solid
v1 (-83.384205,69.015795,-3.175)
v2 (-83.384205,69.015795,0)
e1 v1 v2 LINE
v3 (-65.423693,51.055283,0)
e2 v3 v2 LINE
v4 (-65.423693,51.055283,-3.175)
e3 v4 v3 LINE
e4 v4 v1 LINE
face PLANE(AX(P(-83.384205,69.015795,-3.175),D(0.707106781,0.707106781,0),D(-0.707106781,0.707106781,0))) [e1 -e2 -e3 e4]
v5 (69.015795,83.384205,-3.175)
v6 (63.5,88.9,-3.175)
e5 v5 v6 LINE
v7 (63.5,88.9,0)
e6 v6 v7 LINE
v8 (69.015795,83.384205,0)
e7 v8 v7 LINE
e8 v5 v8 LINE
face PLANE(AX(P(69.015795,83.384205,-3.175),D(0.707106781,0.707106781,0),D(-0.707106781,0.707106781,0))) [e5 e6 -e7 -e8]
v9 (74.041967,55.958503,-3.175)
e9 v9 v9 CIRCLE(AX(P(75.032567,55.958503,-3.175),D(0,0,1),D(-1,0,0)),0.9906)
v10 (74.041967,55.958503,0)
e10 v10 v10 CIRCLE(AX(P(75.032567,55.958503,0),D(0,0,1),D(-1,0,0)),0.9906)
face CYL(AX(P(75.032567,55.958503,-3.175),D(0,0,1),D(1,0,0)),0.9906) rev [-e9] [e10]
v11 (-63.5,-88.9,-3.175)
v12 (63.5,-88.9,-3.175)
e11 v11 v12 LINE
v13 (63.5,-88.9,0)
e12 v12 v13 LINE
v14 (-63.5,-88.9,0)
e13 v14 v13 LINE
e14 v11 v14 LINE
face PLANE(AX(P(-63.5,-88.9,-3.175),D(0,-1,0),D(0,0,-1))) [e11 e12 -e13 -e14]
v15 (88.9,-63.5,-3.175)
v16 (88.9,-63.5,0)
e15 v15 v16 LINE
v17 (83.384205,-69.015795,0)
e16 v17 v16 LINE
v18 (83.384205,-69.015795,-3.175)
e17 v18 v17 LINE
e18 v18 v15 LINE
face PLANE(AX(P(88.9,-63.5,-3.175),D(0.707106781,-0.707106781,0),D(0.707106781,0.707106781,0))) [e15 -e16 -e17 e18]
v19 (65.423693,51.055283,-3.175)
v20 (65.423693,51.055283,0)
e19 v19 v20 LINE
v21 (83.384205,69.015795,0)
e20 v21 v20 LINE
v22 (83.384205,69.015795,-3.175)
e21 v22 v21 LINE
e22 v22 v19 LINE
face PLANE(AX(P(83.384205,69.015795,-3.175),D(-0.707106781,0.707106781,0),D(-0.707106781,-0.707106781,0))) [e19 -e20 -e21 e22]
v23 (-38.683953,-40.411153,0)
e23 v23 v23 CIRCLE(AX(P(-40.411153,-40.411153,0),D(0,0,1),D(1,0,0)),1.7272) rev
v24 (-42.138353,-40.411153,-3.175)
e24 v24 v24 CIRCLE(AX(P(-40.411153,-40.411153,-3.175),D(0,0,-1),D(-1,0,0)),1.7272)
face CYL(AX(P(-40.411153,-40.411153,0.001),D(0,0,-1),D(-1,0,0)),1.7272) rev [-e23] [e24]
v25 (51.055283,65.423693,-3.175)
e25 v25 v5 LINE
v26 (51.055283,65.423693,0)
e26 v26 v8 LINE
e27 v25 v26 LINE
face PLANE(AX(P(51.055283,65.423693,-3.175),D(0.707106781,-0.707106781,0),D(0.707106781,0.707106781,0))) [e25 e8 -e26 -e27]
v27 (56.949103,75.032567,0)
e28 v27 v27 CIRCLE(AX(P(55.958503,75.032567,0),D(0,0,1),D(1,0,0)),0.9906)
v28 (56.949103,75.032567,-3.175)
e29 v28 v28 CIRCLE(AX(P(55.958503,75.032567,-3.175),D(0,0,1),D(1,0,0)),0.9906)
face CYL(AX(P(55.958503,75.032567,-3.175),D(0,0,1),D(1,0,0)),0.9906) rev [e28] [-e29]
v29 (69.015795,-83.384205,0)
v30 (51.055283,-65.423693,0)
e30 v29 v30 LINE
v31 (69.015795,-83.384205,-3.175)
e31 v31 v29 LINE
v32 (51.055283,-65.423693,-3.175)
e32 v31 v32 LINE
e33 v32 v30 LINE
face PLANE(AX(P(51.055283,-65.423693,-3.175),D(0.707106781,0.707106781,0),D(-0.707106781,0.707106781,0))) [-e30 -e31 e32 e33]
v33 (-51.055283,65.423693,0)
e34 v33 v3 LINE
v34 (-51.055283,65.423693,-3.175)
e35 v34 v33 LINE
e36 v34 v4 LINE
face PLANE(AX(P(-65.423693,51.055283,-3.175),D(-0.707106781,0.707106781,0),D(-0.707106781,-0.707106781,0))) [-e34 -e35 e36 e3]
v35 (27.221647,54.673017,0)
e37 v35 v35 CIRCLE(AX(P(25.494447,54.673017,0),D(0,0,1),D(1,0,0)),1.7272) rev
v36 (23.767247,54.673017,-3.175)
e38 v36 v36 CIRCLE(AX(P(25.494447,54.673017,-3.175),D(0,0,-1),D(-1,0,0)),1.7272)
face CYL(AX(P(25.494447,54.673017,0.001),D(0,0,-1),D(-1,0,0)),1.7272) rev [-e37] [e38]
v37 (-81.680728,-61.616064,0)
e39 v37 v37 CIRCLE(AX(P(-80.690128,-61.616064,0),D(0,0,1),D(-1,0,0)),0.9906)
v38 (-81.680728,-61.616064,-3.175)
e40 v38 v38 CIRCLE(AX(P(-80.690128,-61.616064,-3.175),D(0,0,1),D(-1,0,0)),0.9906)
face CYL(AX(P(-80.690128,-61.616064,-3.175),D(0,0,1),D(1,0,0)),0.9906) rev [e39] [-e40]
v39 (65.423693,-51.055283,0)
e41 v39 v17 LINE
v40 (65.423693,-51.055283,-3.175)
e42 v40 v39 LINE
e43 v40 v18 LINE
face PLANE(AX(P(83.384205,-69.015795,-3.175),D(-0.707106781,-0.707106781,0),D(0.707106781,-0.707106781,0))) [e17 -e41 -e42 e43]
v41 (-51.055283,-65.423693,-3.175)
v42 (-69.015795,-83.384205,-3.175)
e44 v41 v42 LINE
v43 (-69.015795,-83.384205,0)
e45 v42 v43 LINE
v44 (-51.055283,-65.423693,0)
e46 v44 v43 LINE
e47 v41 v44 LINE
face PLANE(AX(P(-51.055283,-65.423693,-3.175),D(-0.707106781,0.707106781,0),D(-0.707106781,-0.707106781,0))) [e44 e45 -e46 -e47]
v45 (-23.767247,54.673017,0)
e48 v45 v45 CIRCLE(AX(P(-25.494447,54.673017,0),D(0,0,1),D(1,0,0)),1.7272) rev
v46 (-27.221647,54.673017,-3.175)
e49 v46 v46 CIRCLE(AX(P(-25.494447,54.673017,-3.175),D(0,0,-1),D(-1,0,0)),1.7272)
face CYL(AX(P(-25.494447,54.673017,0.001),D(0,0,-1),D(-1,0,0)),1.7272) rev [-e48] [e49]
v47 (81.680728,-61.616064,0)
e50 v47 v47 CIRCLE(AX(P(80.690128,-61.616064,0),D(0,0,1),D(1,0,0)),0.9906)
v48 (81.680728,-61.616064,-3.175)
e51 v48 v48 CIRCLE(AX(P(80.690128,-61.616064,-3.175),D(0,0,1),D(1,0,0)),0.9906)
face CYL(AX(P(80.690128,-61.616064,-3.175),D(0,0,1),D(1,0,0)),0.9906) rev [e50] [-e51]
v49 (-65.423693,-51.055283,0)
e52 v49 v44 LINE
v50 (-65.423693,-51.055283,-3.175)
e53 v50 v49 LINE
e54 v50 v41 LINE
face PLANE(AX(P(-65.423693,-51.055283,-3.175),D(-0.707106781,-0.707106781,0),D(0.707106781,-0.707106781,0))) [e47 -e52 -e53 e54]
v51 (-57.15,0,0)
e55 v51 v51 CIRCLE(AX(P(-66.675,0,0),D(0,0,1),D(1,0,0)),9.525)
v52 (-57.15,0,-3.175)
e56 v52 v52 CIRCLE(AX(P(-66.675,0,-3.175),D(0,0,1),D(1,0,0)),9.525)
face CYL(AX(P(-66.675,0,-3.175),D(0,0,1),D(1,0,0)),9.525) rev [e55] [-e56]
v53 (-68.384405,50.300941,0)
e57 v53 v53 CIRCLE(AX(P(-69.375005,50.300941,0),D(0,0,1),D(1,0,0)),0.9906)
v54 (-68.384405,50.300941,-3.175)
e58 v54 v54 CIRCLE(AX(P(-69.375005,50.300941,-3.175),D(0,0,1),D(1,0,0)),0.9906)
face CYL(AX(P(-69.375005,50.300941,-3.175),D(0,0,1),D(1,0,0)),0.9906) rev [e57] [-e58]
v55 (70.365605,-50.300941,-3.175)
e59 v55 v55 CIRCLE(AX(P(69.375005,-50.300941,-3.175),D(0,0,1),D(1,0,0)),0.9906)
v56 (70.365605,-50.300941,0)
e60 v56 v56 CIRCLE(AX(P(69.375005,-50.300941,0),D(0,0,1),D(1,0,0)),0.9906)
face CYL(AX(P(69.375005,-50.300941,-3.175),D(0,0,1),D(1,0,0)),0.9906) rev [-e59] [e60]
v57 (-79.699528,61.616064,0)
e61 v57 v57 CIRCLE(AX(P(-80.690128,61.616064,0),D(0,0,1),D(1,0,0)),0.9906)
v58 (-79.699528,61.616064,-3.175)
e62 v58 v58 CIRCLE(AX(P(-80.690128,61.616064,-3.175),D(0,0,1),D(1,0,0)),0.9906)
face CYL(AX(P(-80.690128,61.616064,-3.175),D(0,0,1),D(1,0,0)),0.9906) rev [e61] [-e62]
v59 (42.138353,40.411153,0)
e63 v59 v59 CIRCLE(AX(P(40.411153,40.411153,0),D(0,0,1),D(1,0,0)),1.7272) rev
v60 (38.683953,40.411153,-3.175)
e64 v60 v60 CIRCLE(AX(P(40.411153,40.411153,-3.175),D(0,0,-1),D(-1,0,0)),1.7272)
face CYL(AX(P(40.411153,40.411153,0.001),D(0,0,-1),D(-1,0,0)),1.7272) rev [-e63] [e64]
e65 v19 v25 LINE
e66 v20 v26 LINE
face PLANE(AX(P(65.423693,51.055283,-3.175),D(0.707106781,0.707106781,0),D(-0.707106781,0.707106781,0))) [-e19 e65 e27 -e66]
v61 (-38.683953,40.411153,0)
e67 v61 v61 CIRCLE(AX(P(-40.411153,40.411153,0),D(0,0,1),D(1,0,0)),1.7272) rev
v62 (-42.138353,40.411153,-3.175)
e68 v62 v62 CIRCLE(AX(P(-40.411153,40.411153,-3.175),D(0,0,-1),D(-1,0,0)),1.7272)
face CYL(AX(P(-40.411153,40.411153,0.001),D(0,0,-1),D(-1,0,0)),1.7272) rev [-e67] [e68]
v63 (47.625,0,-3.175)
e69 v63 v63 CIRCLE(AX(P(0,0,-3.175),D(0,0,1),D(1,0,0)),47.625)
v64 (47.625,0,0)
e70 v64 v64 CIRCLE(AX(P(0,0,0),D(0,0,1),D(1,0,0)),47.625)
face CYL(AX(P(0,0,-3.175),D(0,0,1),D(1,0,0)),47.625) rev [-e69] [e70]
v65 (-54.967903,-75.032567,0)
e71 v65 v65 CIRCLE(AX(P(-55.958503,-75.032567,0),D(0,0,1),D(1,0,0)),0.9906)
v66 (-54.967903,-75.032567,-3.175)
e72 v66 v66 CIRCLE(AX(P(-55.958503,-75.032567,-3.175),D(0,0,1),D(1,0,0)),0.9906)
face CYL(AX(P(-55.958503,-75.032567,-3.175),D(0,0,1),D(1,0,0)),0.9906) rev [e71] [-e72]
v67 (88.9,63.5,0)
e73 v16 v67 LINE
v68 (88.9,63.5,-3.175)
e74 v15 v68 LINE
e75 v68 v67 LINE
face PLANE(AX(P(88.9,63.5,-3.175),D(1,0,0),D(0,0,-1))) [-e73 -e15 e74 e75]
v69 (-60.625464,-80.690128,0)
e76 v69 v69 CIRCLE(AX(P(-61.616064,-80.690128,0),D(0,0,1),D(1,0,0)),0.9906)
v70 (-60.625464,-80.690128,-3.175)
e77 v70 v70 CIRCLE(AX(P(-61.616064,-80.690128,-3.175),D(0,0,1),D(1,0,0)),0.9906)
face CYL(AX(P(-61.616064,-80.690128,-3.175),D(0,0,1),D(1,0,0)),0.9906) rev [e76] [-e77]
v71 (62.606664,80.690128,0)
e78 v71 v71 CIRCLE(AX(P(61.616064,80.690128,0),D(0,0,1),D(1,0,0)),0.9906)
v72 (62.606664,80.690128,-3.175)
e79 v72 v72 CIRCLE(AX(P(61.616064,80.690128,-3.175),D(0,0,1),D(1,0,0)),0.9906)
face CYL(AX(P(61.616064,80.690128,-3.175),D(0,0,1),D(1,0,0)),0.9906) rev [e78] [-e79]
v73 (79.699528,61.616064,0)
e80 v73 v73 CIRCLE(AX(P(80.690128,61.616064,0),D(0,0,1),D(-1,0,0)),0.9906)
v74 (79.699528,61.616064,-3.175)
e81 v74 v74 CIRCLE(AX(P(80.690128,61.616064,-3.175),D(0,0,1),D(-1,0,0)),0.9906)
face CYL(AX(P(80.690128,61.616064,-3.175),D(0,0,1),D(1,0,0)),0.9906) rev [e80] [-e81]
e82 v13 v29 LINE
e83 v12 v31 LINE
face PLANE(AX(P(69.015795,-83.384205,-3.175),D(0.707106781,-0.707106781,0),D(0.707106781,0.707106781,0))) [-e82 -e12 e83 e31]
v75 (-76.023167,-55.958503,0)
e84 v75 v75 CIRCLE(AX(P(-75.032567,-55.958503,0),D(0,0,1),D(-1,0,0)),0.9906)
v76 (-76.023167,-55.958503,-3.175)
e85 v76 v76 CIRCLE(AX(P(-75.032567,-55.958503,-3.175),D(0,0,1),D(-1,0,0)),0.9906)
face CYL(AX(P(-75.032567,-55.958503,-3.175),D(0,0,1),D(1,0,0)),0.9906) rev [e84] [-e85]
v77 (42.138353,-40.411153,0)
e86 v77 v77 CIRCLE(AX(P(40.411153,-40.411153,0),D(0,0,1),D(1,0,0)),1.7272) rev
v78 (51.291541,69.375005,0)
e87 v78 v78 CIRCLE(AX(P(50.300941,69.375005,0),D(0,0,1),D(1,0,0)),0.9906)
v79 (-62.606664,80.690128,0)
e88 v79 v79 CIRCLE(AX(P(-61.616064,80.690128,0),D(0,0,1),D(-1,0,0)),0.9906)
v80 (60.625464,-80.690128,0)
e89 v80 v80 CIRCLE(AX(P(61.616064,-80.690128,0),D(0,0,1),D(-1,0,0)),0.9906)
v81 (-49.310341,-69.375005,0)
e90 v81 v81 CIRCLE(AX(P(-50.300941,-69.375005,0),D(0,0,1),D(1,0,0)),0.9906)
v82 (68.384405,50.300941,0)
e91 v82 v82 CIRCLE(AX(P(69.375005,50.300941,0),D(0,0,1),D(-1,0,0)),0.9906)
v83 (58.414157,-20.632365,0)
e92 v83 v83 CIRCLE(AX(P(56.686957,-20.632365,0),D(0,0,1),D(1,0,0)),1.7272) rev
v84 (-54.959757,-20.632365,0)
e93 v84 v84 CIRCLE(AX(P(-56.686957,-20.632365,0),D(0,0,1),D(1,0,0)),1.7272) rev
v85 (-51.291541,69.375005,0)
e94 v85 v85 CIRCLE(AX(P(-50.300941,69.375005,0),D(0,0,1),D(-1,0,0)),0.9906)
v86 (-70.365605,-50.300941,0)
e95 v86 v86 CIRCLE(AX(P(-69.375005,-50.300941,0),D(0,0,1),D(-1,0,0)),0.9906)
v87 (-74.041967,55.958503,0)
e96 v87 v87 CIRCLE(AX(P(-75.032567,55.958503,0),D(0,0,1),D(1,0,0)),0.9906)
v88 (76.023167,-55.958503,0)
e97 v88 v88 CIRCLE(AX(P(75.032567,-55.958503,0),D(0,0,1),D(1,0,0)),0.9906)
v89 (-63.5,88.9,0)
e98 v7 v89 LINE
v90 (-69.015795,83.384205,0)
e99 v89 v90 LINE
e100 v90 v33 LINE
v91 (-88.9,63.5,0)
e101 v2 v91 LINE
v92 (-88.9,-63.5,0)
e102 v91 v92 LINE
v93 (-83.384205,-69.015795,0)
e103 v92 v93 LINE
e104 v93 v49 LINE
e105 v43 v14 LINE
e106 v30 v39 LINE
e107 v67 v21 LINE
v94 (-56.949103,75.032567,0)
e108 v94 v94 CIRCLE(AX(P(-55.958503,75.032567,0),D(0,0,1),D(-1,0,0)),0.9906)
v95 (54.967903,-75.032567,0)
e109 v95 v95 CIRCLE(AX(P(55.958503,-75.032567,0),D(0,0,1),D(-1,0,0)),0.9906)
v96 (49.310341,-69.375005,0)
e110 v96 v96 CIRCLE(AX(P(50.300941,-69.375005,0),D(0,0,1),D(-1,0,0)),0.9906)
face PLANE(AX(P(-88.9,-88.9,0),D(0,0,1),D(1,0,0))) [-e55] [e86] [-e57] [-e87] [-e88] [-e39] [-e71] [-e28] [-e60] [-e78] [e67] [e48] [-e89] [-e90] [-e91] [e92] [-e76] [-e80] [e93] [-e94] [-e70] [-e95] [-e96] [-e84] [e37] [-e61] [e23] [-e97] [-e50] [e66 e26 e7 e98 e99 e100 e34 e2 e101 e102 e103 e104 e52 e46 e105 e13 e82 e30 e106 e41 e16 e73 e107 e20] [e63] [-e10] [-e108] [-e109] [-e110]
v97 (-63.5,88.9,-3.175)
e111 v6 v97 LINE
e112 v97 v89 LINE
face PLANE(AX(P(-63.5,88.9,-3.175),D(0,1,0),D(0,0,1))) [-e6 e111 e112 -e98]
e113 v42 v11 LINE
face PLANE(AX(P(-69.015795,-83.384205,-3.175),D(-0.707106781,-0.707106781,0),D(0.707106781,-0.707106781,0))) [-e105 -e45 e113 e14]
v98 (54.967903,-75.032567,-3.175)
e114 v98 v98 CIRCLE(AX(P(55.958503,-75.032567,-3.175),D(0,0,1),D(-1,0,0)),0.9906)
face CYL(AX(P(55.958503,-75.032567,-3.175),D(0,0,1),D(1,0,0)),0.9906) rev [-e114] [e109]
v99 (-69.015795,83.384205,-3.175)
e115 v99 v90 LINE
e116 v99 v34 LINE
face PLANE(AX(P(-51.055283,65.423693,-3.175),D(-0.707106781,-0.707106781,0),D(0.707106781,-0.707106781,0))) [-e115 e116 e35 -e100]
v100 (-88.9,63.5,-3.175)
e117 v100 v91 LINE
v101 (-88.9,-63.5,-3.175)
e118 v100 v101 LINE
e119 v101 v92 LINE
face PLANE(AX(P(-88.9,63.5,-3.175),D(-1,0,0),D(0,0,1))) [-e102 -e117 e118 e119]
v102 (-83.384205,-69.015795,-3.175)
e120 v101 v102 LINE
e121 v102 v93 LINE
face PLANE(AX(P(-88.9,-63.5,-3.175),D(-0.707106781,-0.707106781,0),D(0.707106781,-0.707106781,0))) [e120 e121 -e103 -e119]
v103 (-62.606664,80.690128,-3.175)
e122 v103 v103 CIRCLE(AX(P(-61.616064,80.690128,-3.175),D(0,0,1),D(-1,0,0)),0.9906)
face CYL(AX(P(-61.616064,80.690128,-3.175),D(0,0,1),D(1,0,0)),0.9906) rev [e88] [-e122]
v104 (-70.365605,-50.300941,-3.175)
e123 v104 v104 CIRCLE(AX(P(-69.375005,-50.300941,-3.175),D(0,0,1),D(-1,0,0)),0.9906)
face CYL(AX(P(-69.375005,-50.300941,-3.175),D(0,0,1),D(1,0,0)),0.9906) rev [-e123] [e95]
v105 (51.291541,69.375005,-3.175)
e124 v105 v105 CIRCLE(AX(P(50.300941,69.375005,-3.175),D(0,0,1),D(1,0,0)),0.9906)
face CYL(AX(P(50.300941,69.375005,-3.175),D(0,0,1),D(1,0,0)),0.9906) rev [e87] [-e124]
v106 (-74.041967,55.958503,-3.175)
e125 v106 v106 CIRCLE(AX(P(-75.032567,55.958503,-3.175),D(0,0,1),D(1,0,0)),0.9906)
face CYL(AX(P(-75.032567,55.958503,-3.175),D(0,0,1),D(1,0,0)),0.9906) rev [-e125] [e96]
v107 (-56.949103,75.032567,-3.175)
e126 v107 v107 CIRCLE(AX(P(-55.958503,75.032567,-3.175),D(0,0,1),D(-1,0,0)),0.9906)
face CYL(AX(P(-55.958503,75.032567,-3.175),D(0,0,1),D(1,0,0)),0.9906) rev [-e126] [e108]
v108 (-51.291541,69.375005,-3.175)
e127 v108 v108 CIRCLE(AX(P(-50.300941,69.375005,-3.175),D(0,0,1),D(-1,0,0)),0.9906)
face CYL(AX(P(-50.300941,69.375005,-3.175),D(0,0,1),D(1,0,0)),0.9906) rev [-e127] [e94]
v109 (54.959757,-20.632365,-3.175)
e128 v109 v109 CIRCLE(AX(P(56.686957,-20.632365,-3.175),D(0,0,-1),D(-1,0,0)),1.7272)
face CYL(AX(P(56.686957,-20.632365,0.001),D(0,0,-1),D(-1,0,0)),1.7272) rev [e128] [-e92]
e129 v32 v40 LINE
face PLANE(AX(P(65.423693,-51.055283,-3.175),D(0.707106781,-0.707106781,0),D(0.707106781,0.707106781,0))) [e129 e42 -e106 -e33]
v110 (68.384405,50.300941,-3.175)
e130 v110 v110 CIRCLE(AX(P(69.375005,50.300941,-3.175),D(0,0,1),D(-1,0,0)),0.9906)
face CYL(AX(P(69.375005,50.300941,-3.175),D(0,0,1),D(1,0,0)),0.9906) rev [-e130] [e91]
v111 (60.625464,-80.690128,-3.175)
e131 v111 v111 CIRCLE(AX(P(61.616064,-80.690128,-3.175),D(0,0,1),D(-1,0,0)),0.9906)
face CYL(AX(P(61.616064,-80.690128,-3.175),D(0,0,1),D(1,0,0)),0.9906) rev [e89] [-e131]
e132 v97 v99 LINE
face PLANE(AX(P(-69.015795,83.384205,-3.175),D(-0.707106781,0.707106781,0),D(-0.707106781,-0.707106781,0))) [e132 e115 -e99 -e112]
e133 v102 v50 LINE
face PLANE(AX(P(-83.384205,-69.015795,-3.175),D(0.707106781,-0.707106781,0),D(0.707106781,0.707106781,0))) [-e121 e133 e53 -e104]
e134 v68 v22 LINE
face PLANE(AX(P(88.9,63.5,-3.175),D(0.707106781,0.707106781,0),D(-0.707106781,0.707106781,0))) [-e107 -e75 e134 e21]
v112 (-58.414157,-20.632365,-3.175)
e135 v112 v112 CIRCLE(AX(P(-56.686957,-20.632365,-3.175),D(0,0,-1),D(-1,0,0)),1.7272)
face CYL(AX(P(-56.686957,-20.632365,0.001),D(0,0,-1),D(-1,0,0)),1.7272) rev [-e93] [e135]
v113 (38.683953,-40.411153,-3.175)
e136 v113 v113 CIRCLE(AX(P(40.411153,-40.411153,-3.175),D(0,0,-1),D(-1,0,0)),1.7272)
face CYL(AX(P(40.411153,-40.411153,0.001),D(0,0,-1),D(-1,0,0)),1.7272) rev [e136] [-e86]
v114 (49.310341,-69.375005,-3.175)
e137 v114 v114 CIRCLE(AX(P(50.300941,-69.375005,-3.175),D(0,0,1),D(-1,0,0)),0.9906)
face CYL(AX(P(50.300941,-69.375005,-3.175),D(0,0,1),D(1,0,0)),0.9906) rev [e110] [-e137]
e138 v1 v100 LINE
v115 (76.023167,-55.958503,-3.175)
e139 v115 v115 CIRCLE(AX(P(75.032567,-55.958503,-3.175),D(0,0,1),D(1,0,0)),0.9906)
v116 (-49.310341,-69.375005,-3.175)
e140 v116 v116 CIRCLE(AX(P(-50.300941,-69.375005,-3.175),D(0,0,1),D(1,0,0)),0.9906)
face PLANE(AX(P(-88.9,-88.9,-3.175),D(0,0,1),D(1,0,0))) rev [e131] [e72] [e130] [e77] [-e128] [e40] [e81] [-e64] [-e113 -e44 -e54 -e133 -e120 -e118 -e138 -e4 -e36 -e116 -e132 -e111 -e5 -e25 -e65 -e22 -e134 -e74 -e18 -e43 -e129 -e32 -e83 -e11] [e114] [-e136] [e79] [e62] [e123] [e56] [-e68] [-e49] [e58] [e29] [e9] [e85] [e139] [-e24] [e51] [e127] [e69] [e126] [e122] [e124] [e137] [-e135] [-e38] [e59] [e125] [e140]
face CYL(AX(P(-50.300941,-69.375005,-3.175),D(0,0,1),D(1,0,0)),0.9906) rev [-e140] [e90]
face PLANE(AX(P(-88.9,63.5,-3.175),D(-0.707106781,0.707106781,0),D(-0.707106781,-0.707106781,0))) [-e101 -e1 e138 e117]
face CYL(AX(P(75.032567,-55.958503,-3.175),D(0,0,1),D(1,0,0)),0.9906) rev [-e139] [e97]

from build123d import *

# Parameters (mm, degrees)
SKETCH1_R          = 9.525
SKETCH1_R_2        = 0.9906
SKETCH1_R_3        = 47.625
EXTRUDE1_DEPTH     = 3.175
SKETCH2_R          = 1.7272
CUT_EXTRUDE1_DEPTH = 3.175
SPLIT1_START       = -3.175
SPLIT1_OUTLINE_R   = 1.7272
SPLIT1_DEPTH       = 3.175


# Read off the part's stored shape, not the designer's step: Split1
with BuildPart() as part:
    # Sketch1 → Extrude1 (new body)
    with BuildSketch(Plane.XY):
        Polygon((-88.9, 63.5), (-83.384204897, 69.015795103), (-65.423692655, 51.055282861), (-51.055282861, 65.423692655), (-69.015795103, 83.384204897), (-63.5, 88.9), (63.5, 88.9), (69.015795103, 83.384204897), (51.055282861, 65.423692655), (65.423692655, 51.055282861), (83.384204897, 69.015795103), (88.9, 63.5), (88.9, -63.5), (83.384204897, -69.015795103), (65.423692655, -51.055282861), (51.055282861, -65.423692655), (69.015795103, -83.384204897), (63.5, -88.9), (-63.5, -88.9), (-69.015795103, -83.384204897), (-51.055282861, -65.423692655), (-65.423692655, -51.055282861), (-83.384204897, -69.015795103), (-88.9, -63.5), align=None)
        with Locations((-66.675, 0)):
            Circle(SKETCH1_R, mode=Mode.SUBTRACT)
        with Locations((-80.690128061, 61.616064059)):
            Circle(SKETCH1_R_2, mode=Mode.SUBTRACT)
        with Locations((-75.032566704, 55.958502703)):
            Circle(SKETCH1_R_2, mode=Mode.SUBTRACT)
        with Locations((-69.375005348, 50.300941347)):
            Circle(SKETCH1_R_2, mode=Mode.SUBTRACT)
        with Locations(Location((-50.300941347, 69.375005348, 0), (0, 0, 180))):
            Circle(SKETCH1_R_2, mode=Mode.SUBTRACT)
        with Locations(Location((-55.958502703, 75.032566704, 0), (0, 0, 180))):
            Circle(SKETCH1_R_2, mode=Mode.SUBTRACT)
        with Locations(Location((-61.616064059, 80.690128061, 0), (0, 0, 180))):
            Circle(SKETCH1_R_2, mode=Mode.SUBTRACT)
        with Locations((50.300941347, 69.375005348)):
            Circle(SKETCH1_R_2, mode=Mode.SUBTRACT)
        with Locations((55.958502703, 75.032566704)):
            Circle(SKETCH1_R_2, mode=Mode.SUBTRACT)
        with Locations((61.616064059, 80.690128061)):
            Circle(SKETCH1_R_2, mode=Mode.SUBTRACT)
        with Locations(Location((69.375005348, 50.300941347, 0), (0, 0, 180))):
            Circle(SKETCH1_R_2, mode=Mode.SUBTRACT)
        with Locations(Location((75.032566704, 55.958502703, 0), (0, 0, 180))):
            Circle(SKETCH1_R_2, mode=Mode.SUBTRACT)
        with Locations(Location((80.690128061, 61.616064059, 0), (0, 0, 180))):
            Circle(SKETCH1_R_2, mode=Mode.SUBTRACT)
        with Locations((80.690128061, -61.616064059)):
            Circle(SKETCH1_R_2, mode=Mode.SUBTRACT)
        with Locations((75.032566704, -55.958502703)):
            Circle(SKETCH1_R_2, mode=Mode.SUBTRACT)
        with Locations((69.375005348, -50.300941347)):
            Circle(SKETCH1_R_2, mode=Mode.SUBTRACT)
        with Locations(Location((61.616064059, -80.690128061, 0), (0, 0, 180))):
            Circle(SKETCH1_R_2, mode=Mode.SUBTRACT)
        with Locations(Location((55.958502703, -75.032566704, 0), (0, 0, 180))):
            Circle(SKETCH1_R_2, mode=Mode.SUBTRACT)
        with Locations(Location((50.300941347, -69.375005348, 0), (0, 0, 180))):
            Circle(SKETCH1_R_2, mode=Mode.SUBTRACT)
        with Locations((-61.616064059, -80.690128061)):
            Circle(SKETCH1_R_2, mode=Mode.SUBTRACT)
        with Locations((-55.958502703, -75.032566704)):
            Circle(SKETCH1_R_2, mode=Mode.SUBTRACT)
        with Locations((-50.300941347, -69.375005348)):
            Circle(SKETCH1_R_2, mode=Mode.SUBTRACT)
        with Locations(Location((-80.690128061, -61.616064059, 0), (0, 0, 180))):
            Circle(SKETCH1_R_2, mode=Mode.SUBTRACT)
        with Locations(Location((-75.032566704, -55.958502703, 0), (0, 0, 180))):
            Circle(SKETCH1_R_2, mode=Mode.SUBTRACT)
        with Locations(Location((-69.375005348, -50.300941347, 0), (0, 0, 180))):
            Circle(SKETCH1_R_2, mode=Mode.SUBTRACT)
        Circle(SKETCH1_R_3, mode=Mode.SUBTRACT)
    extrude(amount=-EXTRUDE1_DEPTH)

    # Sketch2 → Cut-Extrude1 (cut)
    with BuildSketch(Plane(origin=(0, 0, -3.175), x_dir=(-1, 0, 0), z_dir=(0, 0, -1))):
        with Locations((-40.411152545, -40.411152545)):
            Circle(SKETCH2_R)
        with Locations((40.411152545, 40.411152545)):
            Circle(SKETCH2_R)
        with Locations((40.411152545, -40.411152545)):
            Circle(SKETCH2_R)
        with Locations((-40.411152545, 40.411152545)):
            Circle(SKETCH2_R)
    extrude(amount=-CUT_EXTRUDE1_DEPTH, mode=Mode.SUBTRACT)

    # Split1 outline → Split1 (cut)
    with BuildSketch(Plane.XY.offset(SPLIT1_START)):
        with Locations((25.49444664, 54.673017253)):
            Circle(SPLIT1_OUTLINE_R)
        with Locations((-56.686957349, -20.632365146)):
            Circle(SPLIT1_OUTLINE_R)
        with Locations((-25.49444664, 54.673017253)):
            Circle(SPLIT1_OUTLINE_R)
        with Locations((56.686957349, -20.632365146)):
            Circle(SPLIT1_OUTLINE_R)
    extrude(amount=SPLIT1_DEPTH, mode=Mode.SUBTRACT)


solid = part.part
